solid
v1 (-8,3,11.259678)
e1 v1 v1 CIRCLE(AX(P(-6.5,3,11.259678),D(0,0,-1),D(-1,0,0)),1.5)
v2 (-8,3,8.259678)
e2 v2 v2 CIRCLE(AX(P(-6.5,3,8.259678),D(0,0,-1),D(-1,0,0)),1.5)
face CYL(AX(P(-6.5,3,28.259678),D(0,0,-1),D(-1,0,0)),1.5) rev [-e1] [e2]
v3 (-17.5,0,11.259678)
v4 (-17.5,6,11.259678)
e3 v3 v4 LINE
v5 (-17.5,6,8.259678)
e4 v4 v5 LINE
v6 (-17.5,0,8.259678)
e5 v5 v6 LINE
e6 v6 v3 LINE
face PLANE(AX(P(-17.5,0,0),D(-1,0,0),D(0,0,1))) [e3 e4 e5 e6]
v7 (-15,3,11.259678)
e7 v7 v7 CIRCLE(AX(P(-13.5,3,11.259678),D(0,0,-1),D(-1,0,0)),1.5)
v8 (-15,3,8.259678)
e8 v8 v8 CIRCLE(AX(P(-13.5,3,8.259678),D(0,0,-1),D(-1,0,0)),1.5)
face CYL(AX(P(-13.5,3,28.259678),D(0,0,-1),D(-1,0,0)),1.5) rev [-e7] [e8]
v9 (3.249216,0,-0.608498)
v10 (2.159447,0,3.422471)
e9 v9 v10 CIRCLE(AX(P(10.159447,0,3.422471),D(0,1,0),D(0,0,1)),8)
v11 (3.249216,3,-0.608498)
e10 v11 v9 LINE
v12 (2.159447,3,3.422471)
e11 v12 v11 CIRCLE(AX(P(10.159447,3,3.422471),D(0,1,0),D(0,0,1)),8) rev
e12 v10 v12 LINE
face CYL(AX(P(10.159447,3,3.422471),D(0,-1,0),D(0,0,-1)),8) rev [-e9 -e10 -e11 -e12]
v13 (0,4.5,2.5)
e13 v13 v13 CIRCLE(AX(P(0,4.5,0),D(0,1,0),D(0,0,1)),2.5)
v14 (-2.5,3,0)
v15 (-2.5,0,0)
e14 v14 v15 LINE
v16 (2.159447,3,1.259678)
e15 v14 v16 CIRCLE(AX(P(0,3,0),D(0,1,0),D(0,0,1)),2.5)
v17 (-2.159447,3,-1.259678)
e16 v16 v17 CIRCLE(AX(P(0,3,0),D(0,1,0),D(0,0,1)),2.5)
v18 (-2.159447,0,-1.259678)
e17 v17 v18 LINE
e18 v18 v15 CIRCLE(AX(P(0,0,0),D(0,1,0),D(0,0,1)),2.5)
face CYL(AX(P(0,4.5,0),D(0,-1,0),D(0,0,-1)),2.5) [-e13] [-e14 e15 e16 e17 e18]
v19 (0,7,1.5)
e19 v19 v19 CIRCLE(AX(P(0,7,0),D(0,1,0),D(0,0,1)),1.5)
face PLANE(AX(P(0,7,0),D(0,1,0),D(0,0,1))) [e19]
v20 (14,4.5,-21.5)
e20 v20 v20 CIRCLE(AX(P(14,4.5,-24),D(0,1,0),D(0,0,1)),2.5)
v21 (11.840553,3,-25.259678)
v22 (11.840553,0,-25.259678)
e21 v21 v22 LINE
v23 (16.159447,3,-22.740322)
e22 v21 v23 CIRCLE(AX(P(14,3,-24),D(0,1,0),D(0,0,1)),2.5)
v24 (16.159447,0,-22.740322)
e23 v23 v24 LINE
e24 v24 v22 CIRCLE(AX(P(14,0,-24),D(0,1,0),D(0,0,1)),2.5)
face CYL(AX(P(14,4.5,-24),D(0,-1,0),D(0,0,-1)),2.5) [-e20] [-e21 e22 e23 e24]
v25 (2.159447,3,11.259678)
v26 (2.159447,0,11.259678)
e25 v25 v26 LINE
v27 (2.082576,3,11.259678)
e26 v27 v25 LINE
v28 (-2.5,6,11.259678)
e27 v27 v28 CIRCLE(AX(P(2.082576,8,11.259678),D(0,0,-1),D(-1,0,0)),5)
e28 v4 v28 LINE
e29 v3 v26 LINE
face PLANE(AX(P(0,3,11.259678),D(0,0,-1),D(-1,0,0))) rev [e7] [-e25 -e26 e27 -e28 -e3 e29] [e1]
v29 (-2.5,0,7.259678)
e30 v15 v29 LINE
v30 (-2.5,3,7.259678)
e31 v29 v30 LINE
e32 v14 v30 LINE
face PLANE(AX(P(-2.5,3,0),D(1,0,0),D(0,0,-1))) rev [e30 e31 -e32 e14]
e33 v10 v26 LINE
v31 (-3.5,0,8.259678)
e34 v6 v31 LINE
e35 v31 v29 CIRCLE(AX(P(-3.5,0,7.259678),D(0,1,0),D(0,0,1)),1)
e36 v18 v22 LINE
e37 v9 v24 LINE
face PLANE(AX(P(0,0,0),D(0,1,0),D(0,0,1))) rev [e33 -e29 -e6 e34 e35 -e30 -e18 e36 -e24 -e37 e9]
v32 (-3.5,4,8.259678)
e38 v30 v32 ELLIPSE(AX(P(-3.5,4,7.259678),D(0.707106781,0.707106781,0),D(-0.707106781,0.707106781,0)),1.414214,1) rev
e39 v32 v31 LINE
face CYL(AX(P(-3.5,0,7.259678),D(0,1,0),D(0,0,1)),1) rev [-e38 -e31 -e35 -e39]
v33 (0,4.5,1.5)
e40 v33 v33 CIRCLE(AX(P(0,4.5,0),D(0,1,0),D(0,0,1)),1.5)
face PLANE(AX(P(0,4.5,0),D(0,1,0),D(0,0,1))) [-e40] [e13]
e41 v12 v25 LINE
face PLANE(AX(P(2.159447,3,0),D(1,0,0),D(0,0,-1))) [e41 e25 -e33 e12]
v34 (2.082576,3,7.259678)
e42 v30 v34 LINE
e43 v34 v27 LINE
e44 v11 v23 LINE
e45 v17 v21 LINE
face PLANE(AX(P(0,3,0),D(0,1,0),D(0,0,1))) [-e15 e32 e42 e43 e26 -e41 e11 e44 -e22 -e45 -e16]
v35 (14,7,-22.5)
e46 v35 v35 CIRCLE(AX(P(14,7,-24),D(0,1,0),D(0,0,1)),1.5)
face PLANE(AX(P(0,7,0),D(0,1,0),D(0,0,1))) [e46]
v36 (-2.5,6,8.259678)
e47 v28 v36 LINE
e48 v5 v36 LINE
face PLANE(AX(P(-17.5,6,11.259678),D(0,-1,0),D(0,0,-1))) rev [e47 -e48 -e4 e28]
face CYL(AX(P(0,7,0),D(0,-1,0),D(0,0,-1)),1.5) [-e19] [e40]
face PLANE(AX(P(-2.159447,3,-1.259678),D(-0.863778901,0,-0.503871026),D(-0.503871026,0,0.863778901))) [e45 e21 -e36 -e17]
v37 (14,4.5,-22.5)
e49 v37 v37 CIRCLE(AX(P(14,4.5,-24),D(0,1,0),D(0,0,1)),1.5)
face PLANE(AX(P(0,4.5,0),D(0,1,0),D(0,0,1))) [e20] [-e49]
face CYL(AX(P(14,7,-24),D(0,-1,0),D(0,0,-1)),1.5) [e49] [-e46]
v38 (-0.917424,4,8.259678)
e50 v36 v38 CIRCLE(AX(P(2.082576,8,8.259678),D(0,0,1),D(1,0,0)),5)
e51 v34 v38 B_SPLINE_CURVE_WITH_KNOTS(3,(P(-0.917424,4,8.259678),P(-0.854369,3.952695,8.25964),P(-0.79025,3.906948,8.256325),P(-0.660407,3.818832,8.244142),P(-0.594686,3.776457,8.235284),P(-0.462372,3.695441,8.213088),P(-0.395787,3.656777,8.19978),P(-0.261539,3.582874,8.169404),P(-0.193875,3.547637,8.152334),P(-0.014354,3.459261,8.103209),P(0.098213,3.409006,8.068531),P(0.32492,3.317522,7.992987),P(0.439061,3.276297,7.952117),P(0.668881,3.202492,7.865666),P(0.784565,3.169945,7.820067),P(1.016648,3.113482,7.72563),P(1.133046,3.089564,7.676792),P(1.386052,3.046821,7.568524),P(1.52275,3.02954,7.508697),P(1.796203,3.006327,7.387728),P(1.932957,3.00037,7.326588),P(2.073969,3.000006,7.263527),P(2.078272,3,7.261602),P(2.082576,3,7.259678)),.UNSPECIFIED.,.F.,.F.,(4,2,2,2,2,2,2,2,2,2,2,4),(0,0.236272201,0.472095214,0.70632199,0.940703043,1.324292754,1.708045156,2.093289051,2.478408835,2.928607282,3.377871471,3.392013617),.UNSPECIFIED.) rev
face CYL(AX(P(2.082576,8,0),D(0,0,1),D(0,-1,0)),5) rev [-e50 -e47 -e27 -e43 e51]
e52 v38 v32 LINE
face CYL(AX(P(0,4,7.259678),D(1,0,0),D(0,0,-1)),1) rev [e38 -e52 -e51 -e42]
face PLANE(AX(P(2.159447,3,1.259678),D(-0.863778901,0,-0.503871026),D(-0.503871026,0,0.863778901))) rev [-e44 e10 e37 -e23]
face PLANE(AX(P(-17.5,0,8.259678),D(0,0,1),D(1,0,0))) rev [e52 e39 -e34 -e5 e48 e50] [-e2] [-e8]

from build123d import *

# Parameters (mm, degrees)
BOSS_EXTRUDE1_DEPTH = 3
SKETCH1_4_R         = 2.5000000000000004
SKETCH1_4_R_2       = 1.5
SKETCH1_4_R_3       = 2.500000000000002
SKETCH1_4_R_4       = 1.5000000000000009
BOSS_EXTRUDE2_DEPTH = 4.5
SKETCH1_5_R         = 1.5
SKETCH1_5_R_2       = 1.5000000000000009
BOSS_EXTRUDE3_DEPTH = 7
BOSS_EXTRUDE4_DEPTH = 15
SKETCH4_R           = 1.4999999999999987
SKETCH4_R_2         = 1.5000000000000007
CUT_EXTRUDE1_DEPTH  = 20
FILLET1_R           = 5
FILLET2_R           = 1
FILLET3_R           = 8


with BuildPart() as part:
    # Sketch1 → Boss-Extrude1 (new body)
    with BuildSketch(Plane(origin=(0, 0, 0), x_dir=(1, 0, 0), z_dir=(0, 1, 0))):
        with BuildLine():
            Line((11.840552747753916, 25.259677563810218), (-2.159447252246084, 1.2596775638102156))
            ThreePointArc((-2.1594472522460837, 1.2596775638102162), (0.6524499480361662, 2.413360533635123), (2.5000000000000004, 0))
            ThreePointArc((2.5000000000000004, -6.1e-16), (2.413360533635123, -0.6524499480361662), (2.159447252246083, -1.2596775638102173))
            Line((2.159447252246083, -1.2596775638102156), (16.15944725224609, 22.740322436189782))
            ThreePointArc((16.159447252246085, 22.740322436189782), (12.740322436189784, 21.840552747753915), (11.840552747753918, 25.259677563810218))
        make_face()
        Polygon((2.1594472522460837, -3), (-2.5, -3), (-2.499999999999999, -11.259677563810214), (2.1594472522460846, -11.259677563810214), align=None)
        with BuildLine():
            ThreePointArc((2.159447252246083, -1.2596775638102173), (-0.6524499480361661, -2.413360533635123), (-2.5000000000000004, 3.1e-16))
            Line((-2.5000000000000004, 0), (-2.5, -3))
            Line((-2.5, -3), (2.1594472522460837, -3))
            Line((2.1594472522460832, -3), (2.159447252246083, -1.2596775638102156))
        make_face()
    extrude(amount=BOSS_EXTRUDE1_DEPTH)

    # Sketch1<4> → Boss-Extrude2 (add)
    # profile 1 of 2: a face of its own
    with BuildSketch(Plane(origin=(0, 0, 0), x_dir=(1, 0, 0), z_dir=(0, 1, 0))):
        with Locations(Location((0, 0, 0), (0, 0, 149.743562836))):
            Circle(SKETCH1_4_R)
        with Locations(Location((0, 0, 0), (0, 0, 270))):
            Circle(SKETCH1_4_R_2, mode=Mode.SUBTRACT)
    # profile 2 of 2: a face of its own
    with BuildSketch(Plane(origin=(0, 0, 0), x_dir=(1, 0, 0), z_dir=(0, 1, 0))):
        with Locations(Location((14.000000000000002, 24, 0), (0, 0, 149.743562836))):
            Circle(SKETCH1_4_R_3)
        with Locations(Location((14.000000000000002, 24, 0), (0, 0, 270))):
            Circle(SKETCH1_4_R_4, mode=Mode.SUBTRACT)
    extrude(amount=BOSS_EXTRUDE2_DEPTH)

    # Sketch1<5> → Boss-Extrude3 (add)
    with BuildSketch(Plane(origin=(0, 0, 0), x_dir=(1, 0, 0), z_dir=(0, 1, 0))):
        with Locations(Location((0, 0, 0), (0, 0, 270))):
            Circle(SKETCH1_5_R)
        with Locations(Location((14.000000000000002, 24, 0), (0, 0, 270))):
            Circle(SKETCH1_5_R_2)
    extrude(amount=BOSS_EXTRUDE3_DEPTH)

    # Sketch3 → Boss-Extrude4 (add)
    with BuildSketch(Plane.ZY.offset(2.5000000000000004)):
        Polygon((11.259677563810214, 0), (8.259677563810214, -3.7e-16), (8.259677563810214, 6), (11.259677563810214, 6.000000000000001), align=None)
    extrude(amount=BOSS_EXTRUDE4_DEPTH)

    # Sketch4 → Cut-Extrude1 (cut)
    with BuildSketch(Plane(origin=(9.5e-16, 0, 8.259677563810214), x_dir=(-1, 0, 1.2e-16), z_dir=(-1.2e-16, 0, -1))):
        with Locations((6.500000000000001, 2.999999999999998)):
            Circle(SKETCH4_R)
        with Locations((13.499999999999998, 2.9999999999999996)):
            Circle(SKETCH4_R_2)
    extrude(amount=-CUT_EXTRUDE1_DEPTH, mode=Mode.SUBTRACT)

    # Fillet1
    # the kernel refuses this fillet: 5 mm, written as the material it adds along each edge
    with BuildSketch(Plane(origin=(-2.499999999999999, 3, 11.259677563810214), x_dir=(1, 0, -1.6e-16), z_dir=(-1.6e-16, 0, -1))) as fillet1_piece_1:
        with BuildLine():
            CenterArc((4.582575694955841, -5), FILLET1_R, 90, 66.42182152179817)
            Line((8.9e-16, -3), (0, 0))
            Line((0, 0), (4.582575694955841, 0))
        make_face()
    extrude(amount=3)

    # Fillet2
    fillet2_edges = [part.edges().sort_by_distance(p)[0] for p in [
        (-2.4999999999999996, 1.4999999999999998, 8.259677563810214),
        (-0.20871215252200015, 3, 8.25967756381),
    ]]
    fillet(fillet2_edges, radius=FILLET2_R)

    # Fillet3
    fillet3_edges = [part.edges().sort_by_distance(p)[0] for p in [
        (2.159447252246083, 1.5, 1.2596775638102164),
    ]]
    fillet(fillet3_edges, radius=FILLET3_R)


solid = part.part
